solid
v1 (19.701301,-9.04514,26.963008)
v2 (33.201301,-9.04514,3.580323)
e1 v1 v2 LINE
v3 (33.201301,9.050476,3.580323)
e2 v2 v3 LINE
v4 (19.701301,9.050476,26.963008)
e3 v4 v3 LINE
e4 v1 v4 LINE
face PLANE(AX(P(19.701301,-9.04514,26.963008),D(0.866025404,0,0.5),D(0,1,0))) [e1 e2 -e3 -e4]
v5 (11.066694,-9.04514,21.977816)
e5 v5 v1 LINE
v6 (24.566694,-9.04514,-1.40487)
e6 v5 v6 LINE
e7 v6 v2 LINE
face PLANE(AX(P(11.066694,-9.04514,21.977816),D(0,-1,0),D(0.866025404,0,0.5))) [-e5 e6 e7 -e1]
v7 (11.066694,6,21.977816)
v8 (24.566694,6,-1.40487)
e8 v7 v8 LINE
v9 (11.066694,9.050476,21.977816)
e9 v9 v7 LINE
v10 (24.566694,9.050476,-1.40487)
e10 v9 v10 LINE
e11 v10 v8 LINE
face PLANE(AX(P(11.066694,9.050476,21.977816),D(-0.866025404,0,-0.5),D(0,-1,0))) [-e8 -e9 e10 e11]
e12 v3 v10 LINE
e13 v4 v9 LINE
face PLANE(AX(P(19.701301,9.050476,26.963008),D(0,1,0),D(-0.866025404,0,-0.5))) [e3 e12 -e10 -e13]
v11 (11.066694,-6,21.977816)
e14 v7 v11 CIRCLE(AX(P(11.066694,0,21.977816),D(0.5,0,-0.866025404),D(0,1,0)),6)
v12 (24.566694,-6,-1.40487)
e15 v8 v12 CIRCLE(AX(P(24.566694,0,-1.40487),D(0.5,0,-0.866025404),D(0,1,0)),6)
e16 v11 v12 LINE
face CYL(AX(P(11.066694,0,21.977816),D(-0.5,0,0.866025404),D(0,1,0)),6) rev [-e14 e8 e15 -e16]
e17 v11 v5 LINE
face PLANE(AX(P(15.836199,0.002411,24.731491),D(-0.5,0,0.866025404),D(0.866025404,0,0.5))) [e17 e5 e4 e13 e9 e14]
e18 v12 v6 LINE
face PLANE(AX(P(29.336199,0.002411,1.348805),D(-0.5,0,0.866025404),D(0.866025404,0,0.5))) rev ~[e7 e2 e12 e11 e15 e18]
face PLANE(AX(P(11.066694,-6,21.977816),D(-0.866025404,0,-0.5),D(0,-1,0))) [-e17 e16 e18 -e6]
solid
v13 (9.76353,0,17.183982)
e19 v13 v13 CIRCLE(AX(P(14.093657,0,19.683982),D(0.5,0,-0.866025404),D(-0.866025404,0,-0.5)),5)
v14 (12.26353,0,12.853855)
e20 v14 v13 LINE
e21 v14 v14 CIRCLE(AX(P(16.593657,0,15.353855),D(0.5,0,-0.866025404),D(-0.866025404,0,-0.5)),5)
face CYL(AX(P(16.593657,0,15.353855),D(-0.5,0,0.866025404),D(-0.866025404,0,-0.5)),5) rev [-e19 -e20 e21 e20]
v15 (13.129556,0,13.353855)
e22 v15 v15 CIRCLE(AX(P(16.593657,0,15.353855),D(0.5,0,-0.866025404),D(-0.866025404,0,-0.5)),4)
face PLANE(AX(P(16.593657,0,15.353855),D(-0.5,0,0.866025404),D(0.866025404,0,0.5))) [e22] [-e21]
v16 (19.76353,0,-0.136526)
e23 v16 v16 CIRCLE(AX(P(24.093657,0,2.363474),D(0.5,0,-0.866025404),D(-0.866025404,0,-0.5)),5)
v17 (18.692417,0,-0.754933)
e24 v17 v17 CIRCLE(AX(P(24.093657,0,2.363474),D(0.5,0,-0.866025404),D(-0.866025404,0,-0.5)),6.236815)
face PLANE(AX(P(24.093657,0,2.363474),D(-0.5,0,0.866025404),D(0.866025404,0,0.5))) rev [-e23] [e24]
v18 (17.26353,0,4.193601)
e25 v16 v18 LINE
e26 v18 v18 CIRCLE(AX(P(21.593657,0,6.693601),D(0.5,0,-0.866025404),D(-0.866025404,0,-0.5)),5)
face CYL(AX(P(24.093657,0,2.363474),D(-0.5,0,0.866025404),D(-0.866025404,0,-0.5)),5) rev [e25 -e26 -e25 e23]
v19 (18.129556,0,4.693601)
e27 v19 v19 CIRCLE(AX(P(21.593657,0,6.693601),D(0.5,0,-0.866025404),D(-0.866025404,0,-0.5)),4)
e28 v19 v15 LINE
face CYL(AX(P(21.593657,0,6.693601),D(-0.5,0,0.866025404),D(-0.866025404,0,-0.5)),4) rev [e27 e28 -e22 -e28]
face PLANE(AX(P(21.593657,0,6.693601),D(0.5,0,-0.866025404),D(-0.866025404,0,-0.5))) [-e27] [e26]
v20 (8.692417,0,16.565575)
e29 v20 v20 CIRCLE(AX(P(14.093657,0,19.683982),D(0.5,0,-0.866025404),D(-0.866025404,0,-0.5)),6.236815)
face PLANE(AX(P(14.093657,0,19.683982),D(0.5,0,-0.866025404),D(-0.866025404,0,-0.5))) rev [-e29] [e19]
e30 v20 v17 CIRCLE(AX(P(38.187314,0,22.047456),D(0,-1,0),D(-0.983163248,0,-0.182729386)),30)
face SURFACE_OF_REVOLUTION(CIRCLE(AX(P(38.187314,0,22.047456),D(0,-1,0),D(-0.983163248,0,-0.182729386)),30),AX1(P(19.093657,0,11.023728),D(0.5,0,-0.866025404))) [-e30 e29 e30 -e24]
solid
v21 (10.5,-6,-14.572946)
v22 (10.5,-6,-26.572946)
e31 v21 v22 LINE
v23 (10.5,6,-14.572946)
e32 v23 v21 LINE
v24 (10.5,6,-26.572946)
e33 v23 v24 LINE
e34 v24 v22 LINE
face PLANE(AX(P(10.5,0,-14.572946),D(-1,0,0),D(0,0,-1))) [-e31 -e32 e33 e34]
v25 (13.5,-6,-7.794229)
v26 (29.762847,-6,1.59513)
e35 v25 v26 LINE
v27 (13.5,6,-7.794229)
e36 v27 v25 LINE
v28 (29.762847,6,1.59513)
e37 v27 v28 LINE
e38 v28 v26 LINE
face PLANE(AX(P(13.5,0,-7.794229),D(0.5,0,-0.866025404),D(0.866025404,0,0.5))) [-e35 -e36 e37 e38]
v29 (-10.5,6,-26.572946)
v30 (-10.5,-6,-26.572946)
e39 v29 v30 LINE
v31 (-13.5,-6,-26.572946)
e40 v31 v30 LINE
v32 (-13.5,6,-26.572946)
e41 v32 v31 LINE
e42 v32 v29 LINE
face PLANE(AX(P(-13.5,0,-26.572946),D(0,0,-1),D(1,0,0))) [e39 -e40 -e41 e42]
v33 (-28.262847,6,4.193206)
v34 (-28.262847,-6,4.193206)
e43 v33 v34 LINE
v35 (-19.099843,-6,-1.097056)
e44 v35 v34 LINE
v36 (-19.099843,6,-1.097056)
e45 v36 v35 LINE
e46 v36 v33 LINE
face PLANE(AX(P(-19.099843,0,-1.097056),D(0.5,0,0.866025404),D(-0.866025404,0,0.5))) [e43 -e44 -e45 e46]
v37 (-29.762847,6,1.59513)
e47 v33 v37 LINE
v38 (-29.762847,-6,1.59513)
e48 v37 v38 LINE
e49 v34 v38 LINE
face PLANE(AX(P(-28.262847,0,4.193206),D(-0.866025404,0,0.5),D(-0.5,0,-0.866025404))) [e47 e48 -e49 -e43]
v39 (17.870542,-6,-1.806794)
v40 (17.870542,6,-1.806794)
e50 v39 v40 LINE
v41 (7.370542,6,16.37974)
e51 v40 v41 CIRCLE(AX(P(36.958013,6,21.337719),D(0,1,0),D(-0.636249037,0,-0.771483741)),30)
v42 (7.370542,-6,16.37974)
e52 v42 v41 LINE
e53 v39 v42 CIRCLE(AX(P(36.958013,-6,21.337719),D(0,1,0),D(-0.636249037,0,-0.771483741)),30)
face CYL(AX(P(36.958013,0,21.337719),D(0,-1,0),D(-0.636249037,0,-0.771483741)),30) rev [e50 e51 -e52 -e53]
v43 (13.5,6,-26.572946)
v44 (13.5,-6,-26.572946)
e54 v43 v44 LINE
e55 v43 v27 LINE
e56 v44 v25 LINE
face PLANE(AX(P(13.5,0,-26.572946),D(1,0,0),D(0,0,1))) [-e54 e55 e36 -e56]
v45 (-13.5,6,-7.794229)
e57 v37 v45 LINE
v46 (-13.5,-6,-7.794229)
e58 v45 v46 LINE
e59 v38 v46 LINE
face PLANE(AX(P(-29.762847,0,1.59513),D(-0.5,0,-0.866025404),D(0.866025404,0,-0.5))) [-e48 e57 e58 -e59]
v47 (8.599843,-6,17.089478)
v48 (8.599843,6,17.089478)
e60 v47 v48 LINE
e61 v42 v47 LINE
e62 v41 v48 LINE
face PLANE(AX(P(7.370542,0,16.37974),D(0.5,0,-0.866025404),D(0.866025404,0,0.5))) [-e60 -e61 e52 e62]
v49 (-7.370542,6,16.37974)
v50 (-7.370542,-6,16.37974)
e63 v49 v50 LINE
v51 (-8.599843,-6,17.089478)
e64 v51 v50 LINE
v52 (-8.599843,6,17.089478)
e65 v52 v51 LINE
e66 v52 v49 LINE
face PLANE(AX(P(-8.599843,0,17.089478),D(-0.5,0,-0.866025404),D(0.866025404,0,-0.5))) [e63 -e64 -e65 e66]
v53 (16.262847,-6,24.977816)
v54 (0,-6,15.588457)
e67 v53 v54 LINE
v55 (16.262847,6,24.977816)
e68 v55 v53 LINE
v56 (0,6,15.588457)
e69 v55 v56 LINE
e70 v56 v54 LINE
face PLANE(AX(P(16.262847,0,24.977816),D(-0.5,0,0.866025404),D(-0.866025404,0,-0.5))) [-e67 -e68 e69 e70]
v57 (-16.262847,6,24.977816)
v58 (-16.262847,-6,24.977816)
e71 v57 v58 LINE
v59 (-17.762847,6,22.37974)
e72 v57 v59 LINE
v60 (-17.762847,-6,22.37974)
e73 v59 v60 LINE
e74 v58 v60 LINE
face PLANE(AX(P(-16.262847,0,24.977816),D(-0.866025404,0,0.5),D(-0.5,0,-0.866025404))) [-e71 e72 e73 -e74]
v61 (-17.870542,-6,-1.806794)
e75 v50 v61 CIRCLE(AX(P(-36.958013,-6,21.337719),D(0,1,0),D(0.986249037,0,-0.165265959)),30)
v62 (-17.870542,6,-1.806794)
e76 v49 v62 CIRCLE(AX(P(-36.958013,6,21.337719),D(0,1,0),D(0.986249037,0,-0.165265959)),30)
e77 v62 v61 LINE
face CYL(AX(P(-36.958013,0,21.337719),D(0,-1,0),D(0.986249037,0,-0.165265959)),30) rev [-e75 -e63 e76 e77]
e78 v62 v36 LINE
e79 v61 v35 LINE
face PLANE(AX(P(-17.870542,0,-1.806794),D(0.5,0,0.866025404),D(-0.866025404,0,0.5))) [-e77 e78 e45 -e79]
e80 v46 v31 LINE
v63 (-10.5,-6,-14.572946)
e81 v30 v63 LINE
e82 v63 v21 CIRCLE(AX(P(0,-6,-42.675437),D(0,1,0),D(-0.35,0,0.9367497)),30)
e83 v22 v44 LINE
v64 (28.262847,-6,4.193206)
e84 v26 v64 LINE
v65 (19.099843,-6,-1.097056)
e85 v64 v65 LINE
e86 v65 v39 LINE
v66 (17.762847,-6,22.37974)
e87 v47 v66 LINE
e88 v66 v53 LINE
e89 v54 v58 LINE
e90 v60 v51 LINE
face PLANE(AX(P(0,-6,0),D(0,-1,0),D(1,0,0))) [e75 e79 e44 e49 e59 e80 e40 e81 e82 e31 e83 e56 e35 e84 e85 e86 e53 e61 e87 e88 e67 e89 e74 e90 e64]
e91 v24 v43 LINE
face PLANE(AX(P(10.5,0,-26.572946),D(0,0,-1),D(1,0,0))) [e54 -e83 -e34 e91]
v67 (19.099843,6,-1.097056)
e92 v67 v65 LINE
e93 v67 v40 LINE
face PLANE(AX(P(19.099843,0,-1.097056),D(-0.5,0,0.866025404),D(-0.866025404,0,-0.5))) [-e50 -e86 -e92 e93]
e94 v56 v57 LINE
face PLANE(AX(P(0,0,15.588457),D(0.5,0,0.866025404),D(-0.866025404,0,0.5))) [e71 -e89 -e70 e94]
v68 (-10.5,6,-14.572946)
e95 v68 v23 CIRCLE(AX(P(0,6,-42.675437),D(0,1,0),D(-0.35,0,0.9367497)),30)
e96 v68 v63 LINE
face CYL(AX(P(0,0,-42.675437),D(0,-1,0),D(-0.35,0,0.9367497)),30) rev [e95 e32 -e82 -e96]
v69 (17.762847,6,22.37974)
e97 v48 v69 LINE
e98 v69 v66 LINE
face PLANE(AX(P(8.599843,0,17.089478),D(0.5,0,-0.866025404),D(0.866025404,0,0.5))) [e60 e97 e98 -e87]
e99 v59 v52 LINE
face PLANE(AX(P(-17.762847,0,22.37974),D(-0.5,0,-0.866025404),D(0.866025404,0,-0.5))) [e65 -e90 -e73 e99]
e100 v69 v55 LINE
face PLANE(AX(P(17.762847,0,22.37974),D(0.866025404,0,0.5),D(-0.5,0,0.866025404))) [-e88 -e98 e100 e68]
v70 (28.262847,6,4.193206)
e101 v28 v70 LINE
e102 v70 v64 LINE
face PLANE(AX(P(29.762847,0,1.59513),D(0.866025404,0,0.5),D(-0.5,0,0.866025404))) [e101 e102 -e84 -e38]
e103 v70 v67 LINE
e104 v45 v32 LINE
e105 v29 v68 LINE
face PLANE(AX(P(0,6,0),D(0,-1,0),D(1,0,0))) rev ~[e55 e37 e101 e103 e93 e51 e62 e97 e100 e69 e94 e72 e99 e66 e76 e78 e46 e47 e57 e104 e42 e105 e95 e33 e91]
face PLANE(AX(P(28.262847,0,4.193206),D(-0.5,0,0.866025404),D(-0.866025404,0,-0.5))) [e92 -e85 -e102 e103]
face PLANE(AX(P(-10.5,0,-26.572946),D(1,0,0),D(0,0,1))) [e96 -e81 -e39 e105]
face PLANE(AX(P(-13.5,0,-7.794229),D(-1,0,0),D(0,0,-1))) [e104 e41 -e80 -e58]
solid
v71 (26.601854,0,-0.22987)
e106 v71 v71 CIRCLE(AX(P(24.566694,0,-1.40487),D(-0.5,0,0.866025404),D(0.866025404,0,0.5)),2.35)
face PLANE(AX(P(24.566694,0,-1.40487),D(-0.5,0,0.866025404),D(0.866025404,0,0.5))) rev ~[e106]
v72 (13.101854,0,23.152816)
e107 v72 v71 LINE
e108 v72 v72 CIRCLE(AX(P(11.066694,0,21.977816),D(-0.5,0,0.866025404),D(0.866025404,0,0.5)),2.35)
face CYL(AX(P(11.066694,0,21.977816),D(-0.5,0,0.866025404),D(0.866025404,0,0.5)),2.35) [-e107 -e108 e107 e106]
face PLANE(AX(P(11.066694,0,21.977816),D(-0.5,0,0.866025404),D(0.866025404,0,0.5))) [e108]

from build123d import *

# Parameters (mm, degrees)
F3_DEPTH = 6
F5_DEPTH = 27
F4_R     = 2.35


# Not quite as in the source:
# - a feature of the source that left no trace in its solid (it failed there, or was rolled back) is left out


with BuildPart() as f2:
    # F1 (on Front) → F2 (revolve)
    with BuildSketch(Plane.XZ):
        with BuildLine():
            Line((18.6924170284, -0.7549333807), (19.7635302092, -0.1365258974))
            Line((19.7635302092, -0.1365258974), (17.2635302092, 4.1936011215))
            Line((17.2635302092, 4.1936011215), (18.129555613, 4.6936011215))
            Line((18.129555613, 4.6936011215), (13.129555613, 13.3538551594))
            Line((13.129555613, 13.3538551594), (12.2635302092, 12.8538551594))
            Line((12.2635302092, 12.8538551594), (9.7635302092, 17.1839821783))
            Line((9.7635302092, 17.1839821783), (8.6924170284, 16.565574695))
            ThreePointArc((8.6924170284, 16.565574695), (12.2065523427, 7.0474562809), (18.6924170284, -0.7549333807))
        make_face()
    revolve(axis=Axis((19.0936572281, 0, 11.0237281405), (0.5, 0, -0.8660254038)))


with BuildPart() as f3:
    # F0 (on Front) → F3 (new body, symmetric)
    with BuildSketch(Plane.XZ):
        with BuildLine():
            Line((8.5998433468, 17.0894775242), (17.7628466203, 22.3797399308))
            Line((17.7628466203, 22.3797399308), (16.2628466203, 24.9778161421))
            Line((16.2628466203, 24.9778161421), (0, 15.5884572681))
            Line((0, 15.5884572681), (-16.2628466203, 24.9778161421))
            Line((-16.2628466203, 24.9778161421), (-17.7628466203, 22.3797399308))
            Line((-17.7628466203, 22.3797399308), (-8.5998433468, 17.0894775242))
            Line((-8.5998433468, 17.0894775242), (-7.3705417748, 16.3797399308))
            ThreePointArc((-7.3705417748, 16.3797399308), (-10.9772507707, 6.3377186874), (-17.8705417748, -1.8067935487))
            Line((-17.8705417748, -1.8067935487), (-19.0998433468, -1.0970559552))
            Line((-19.0998433468, -1.0970559552), (-28.2628466203, 4.1932064513))
            Line((-28.2628466203, 4.1932064513), (-29.7628466203, 1.5951302399))
            Line((-29.7628466203, 1.5951302399), (-13.5, -7.7942286341))
            Line((-13.5, -7.7942286341), (-13.5, -26.5729463821))
            Line((-13.5, -26.5729463821), (-10.5, -26.5729463821))
            Line((-10.5, -26.5729463821), (-10.5, -15.992421569))
            Line((-10.5, -15.992421569), (-10.5, -14.5729463821))
            ThreePointArc((-10.5, -14.5729463821), (0, -12.6754373748), (10.5, -14.5729463821))
            Line((10.5, -14.5729463821), (10.5, -15.992421569))
            Line((10.5, -15.992421569), (10.5, -26.5729463821))
            Line((10.5, -26.5729463821), (13.5, -26.5729463821))
            Line((13.5, -26.5729463821), (13.5, -7.7942286341))
            Line((13.5, -7.7942286341), (29.7628466203, 1.5951302399))
            Line((29.7628466203, 1.5951302399), (28.2628466203, 4.1932064513))
            Line((28.2628466203, 4.1932064513), (19.0998433468, -1.0970559552))
            Line((19.0998433468, -1.0970559552), (17.8705417748, -1.8067935487))
            ThreePointArc((17.8705417748, -1.8067935487), (10.9772507707, 6.3377186874), (7.3705417748, 16.3797399308))
            Line((7.3705417748, 16.3797399308), (8.5998433468, 17.0894775242))
        make_face()
    extrude(amount=F3_DEPTH, both=True)


with BuildPart() as f5:
    # F4 (on face) → F5 (new body)
    with BuildSketch(Plane(origin=(-6.75, 0, 11.6913429511), x_dir=(0.8660254038, 0, 0.5), z_dir=(-0.5, 0, 0.8660254038))):
        with BuildLine():
            ThreePointArc((20.5729463821, 6), (26.5729463821, 0), (20.5729463821, -6))
            Line((20.5729463821, -6), (20.5729463821, -9.0451398864))
            Line((20.5729463821, -9.0451398864), (30.5433310568, -9.0451398864))
            Line((30.5433310568, -9.0451398864), (30.5433310568, 9.0504763648))
            Line((30.5433310568, 9.0504763648), (20.5729463821, 9.0504763648))
            Line((20.5729463821, 9.0504763648), (20.5729463821, 6))
        make_face()
    extrude(amount=-F5_DEPTH)


with BuildPart() as f5b:
    # F4 (on face) → F5, piece 2 (new body)
    with BuildSketch(Plane(origin=(-6.75, 0, 11.6913429511), x_dir=(0.8660254038, 0, 0.5), z_dir=(-0.5, 0, 0.8660254038))):
        with Locations((20.5729463821, 0)):
            Circle(F4_R)
    extrude(amount=-F5_DEPTH)


solid = Compound([f2.part, f3.part, f5.part, f5b.part])
